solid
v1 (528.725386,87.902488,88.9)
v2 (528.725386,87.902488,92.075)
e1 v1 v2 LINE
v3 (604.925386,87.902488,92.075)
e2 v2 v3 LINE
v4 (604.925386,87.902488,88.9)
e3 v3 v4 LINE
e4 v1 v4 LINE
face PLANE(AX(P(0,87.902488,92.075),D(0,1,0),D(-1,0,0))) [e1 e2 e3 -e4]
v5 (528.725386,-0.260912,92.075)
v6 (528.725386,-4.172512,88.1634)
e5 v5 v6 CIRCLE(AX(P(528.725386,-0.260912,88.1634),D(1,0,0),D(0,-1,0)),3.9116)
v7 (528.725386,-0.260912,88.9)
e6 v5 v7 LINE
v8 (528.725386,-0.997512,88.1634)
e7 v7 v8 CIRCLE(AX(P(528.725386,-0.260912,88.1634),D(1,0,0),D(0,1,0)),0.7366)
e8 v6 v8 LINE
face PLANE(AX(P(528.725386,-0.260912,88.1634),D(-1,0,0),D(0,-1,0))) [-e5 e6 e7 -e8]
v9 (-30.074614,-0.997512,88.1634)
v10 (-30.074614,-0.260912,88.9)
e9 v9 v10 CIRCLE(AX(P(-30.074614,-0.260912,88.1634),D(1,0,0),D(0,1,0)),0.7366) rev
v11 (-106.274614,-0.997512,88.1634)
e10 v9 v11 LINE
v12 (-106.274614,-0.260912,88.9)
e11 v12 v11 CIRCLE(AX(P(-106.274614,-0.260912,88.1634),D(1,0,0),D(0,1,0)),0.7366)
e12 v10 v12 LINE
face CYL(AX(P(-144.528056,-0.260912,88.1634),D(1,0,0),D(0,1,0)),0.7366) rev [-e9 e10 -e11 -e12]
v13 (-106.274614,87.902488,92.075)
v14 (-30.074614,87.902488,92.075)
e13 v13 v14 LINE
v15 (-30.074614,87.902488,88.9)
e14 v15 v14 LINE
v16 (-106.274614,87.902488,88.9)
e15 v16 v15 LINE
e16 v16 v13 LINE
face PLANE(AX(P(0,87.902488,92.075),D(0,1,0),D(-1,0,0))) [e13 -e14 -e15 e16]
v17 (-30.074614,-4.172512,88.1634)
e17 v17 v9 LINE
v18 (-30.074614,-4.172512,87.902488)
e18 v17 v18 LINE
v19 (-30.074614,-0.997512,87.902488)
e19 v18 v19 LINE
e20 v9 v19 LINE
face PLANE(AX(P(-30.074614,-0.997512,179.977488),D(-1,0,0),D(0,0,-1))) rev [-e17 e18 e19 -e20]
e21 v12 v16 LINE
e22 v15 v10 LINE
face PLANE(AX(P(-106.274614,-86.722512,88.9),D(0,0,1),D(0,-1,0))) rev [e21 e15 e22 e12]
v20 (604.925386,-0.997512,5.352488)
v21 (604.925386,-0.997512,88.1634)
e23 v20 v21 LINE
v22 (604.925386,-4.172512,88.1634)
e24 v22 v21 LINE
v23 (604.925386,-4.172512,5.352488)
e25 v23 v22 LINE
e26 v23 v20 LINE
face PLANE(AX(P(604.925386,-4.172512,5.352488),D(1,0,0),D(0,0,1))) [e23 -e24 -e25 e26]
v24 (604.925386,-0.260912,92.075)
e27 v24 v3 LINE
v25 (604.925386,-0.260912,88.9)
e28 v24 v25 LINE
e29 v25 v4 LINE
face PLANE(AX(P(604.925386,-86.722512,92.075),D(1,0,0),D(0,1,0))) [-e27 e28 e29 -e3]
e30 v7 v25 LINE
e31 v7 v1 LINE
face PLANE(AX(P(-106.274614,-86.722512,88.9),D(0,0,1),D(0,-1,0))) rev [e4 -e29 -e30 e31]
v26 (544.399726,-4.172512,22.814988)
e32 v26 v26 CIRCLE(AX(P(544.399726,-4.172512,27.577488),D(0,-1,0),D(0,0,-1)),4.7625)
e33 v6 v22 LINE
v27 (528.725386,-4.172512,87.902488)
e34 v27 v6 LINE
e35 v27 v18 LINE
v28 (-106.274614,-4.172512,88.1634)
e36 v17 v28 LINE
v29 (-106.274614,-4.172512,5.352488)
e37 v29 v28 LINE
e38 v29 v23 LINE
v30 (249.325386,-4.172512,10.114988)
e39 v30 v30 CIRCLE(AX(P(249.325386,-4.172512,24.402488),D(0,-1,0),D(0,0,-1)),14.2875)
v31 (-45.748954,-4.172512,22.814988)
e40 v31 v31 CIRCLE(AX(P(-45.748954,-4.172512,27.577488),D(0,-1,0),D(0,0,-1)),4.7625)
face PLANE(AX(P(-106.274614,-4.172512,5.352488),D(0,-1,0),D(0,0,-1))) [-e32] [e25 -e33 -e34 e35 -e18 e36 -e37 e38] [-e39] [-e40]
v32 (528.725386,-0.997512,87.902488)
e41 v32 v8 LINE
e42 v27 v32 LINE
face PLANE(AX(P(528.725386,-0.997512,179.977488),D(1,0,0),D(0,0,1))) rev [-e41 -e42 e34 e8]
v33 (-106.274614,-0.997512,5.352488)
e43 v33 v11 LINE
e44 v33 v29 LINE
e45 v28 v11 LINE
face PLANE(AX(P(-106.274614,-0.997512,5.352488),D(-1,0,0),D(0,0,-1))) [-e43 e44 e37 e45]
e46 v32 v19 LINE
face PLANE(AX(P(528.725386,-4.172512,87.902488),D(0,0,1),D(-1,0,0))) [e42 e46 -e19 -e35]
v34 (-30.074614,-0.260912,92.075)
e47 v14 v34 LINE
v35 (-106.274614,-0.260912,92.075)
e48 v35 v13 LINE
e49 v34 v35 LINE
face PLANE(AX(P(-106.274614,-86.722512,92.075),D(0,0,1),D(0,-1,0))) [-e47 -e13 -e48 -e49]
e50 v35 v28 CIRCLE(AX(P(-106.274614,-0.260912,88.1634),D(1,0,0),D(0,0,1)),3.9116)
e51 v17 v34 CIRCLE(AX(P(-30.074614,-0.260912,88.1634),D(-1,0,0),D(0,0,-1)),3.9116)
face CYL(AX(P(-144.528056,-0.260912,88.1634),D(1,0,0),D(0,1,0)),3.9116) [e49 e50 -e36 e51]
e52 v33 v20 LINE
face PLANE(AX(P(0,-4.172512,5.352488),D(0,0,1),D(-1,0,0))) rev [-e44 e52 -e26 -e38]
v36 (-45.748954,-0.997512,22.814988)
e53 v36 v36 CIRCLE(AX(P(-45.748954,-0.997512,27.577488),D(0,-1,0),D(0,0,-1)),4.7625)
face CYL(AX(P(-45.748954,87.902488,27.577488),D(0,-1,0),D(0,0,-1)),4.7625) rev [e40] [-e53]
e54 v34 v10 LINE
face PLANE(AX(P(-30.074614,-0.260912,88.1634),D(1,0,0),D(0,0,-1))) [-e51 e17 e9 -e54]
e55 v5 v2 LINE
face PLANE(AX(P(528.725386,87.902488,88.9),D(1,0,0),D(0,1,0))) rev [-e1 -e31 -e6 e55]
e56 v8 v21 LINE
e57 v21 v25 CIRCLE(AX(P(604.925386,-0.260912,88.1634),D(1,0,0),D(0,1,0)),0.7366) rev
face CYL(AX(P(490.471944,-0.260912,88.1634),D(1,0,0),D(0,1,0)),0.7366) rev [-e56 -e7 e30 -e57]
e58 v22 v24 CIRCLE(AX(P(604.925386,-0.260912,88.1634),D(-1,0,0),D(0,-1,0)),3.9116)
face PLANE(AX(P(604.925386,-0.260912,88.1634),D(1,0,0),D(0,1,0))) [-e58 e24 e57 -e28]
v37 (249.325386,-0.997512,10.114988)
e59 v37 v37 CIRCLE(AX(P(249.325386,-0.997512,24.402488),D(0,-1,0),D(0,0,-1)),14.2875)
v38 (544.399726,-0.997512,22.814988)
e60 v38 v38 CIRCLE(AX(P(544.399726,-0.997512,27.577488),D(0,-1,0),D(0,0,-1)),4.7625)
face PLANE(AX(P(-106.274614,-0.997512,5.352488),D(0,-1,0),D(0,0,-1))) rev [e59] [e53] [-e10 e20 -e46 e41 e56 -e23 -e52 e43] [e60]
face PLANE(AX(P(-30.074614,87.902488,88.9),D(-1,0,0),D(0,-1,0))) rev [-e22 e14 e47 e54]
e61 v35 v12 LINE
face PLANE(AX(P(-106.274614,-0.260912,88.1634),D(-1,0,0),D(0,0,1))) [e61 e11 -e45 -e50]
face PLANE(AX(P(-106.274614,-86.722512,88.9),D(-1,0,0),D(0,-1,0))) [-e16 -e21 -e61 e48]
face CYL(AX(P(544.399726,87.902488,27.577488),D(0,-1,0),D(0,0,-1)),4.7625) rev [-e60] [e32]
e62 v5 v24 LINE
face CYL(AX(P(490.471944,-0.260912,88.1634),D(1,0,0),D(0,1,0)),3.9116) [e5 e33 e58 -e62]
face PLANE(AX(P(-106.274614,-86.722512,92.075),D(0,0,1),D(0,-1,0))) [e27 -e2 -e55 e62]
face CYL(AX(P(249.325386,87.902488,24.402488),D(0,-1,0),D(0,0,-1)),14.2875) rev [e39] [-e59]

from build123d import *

# Parameters (mm, degrees)
SKETCH18_W                   = 711.2
SKETCH18_H                   = 3.175
BASE_FLANGE1_DEPTH           = 174.625
SKETCH23_W                   = 215.9
SKETCH23_H                   = 88.9
CUT_EXTRUDE1_DEPTH           = 630.633777431
SKETCH24_W                   = 127
SKETCH24_H                   = 34.925
CUT_EXTRUDE2_DEPTH           = 630.633777431
SKETCH25_W                   = 215.9
SKETCH25_H                   = 88.9
CUT_EXTRUDE3_DEPTH           = 630.633777431
SKETCH32_W                   = 558.8
SKETCH32_H                   = 92.075
CUT_EXTRUDE6_DEPTH           = 630.633777431
SKETCHED_START               = -106.274614162
SKETCHED_BEND1_OUTLINE_W     = 3.175
SKETCHED_BEND1_OUTLINE_H     = 88.9
SKETCHED_BEND1_OUTLINE_H_2   = 82.55
SKETCHED_BEND1_DEPTH         = 635
SKETCHED_START_2             = 528.725385838
SKETCHED_BEND1_2_DEPTH       = 76.2
SKETCHED_BEND1_3_OUTLINE_W   = 82.55
SKETCHED_BEND1_3_OUTLINE_H   = 3.175
SKETCHED_BEND1_3_DEPTH       = 711.2
SKETCHED_BEND1_4_OUTLINE_W   = 0.997512257
SKETCHED_BEND1_4_OUTLINE_H   = 3.175
SKETCHED_BEND1_4_OUTLINE_W_2 = 87.902487743
SKETCHED_BEND1_4_DEPTH       = 76.2
SKETCHED_BEND1_5_DEPTH       = 76.2
SKETCHED_BEND2_DEPTH         = 711.2
SKETCHED_BEND2_2_OUTLINE_W   = 3.175
SKETCHED_BEND2_2_OUTLINE_H   = 82.55
SKETCHED_BEND2_2_DEPTH       = 711.2
SKETCHED_BEND2_3_DEPTH       = 76.2
SKETCHED_BEND2_4_DEPTH       = 76.2
SKETCH35_R                   = 14.2875
SKETCH35_R_2                 = 4.7625
CUT_EXTRUDE7_DEPTH           = 619.781329454


# Read off the part's stored shape, not the designer's step: Sketched Bend1, Sketched Bend2
# Sheet-metal steps are written as plain solids
with BuildPart() as part:
    # Sketch18 → Base-Flange1 (new body)
    with BuildSketch(Plane.XY):
        with Locations((249.325385838, -1.5875)):
            Rectangle(SKETCH18_W, SKETCH18_H)
    extrude(amount=BASE_FLANGE1_DEPTH)

    # Sketch23 → Cut-Extrude1 (cut, through all)
    with BuildSketch(Plane(origin=(0, 0, 0), x_dir=(1, 0, 0), z_dir=(0, 1, 0))):
        with Locations((77.875385838, -44.45)):
            Rectangle(SKETCH23_W, SKETCH23_H)
    extrude(amount=-CUT_EXTRUDE1_DEPTH, mode=Mode.SUBTRACT)

    # Sketch24 → Cut-Extrude2 (cut, through all)
    with BuildSketch(Plane(origin=(0, 0, 0), x_dir=(1, 0, 0), z_dir=(0, 1, 0))):
        with Locations((249.325385838, -17.4625)):
            Rectangle(SKETCH24_W, SKETCH24_H)
    extrude(amount=-CUT_EXTRUDE2_DEPTH, mode=Mode.SUBTRACT)

    # Sketch25 → Cut-Extrude3 (cut, through all)
    with BuildSketch(Plane(origin=(0, 0, 0), x_dir=(1, 0, 0), z_dir=(0, 1, 0))):
        with Locations((420.775385838, -44.45)):
            Rectangle(SKETCH25_W, SKETCH25_H)
    extrude(amount=-CUT_EXTRUDE3_DEPTH, mode=Mode.SUBTRACT)

    # Sketch32 → Cut-Extrude6 (cut, through all)
    with BuildSketch(Plane.XZ.offset(3.175)):
        with Locations((249.325385838, 46.0375)):
            Rectangle(SKETCH32_W, SKETCH32_H)
    extrude(amount=-CUT_EXTRUDE6_DEPTH, mode=Mode.SUBTRACT)

    # Sketched Bend1 outline → Sketched Bend1 (cut)
    with BuildSketch(Plane.YZ.offset(SKETCHED_START)):
        with Locations((-1.5875, 44.45)):
            Rectangle(SKETCHED_BEND1_OUTLINE_W, SKETCHED_BEND1_OUTLINE_H)
        with Locations((-1.5875, 133.35)):
            Rectangle(SKETCHED_BEND1_OUTLINE_W, SKETCHED_BEND1_OUTLINE_H_2)
    extrude(amount=SKETCHED_BEND1_DEPTH, mode=Mode.SUBTRACT)

    # Sketched Bend1 2 outline → Sketched Bend1 2 (cut)
    with BuildSketch(Plane.YZ.offset(SKETCHED_START_2)):
        with BuildLine():
            ThreePointArc((-3.175, 92.005018799), (-0.896479843, 90.655319942), (0, 88.1634))
            Line((0, 88.1634), (0, 174.625))
            Line((0, 174.625), (-3.175, 174.625))
            Line((-3.175, 174.625), (-3.175, 92.005018799))
        make_face()
    extrude(amount=SKETCHED_BEND1_2_DEPTH, mode=Mode.SUBTRACT)



with BuildPart() as body_2:
    # Sketched Bend1 3 outline → Sketched Bend1 3 (new body)
    with BuildSketch(Plane.YZ.offset(SKETCHED_START)):
        with Locations((-45.447512257, 90.4875)):
            Rectangle(SKETCHED_BEND1_3_OUTLINE_W, SKETCHED_BEND1_3_OUTLINE_H)
    extrude(amount=SKETCHED_BEND1_3_DEPTH)


with BuildPart() as part_1:
    add(part.part)

    add(body_2.part)  # Sketched Bend1 4 merges body 2
    # Sketched Bend1 4 outline → Sketched Bend1 4 (add)
    with BuildSketch(Plane.YZ.offset(SKETCHED_START)):
        with Locations((-3.673756128, 90.4875)):
            Rectangle(SKETCHED_BEND1_4_OUTLINE_W, SKETCHED_BEND1_4_OUTLINE_H)
        with Locations((43.951243872, 90.4875)):
            Rectangle(SKETCHED_BEND1_4_OUTLINE_W_2, SKETCHED_BEND1_4_OUTLINE_H)
    extrude(amount=SKETCHED_BEND1_4_DEPTH)

    # Sketched Bend1 5 outline → Sketched Bend1 5 (add)
    with BuildSketch(Plane.YZ.offset(SKETCHED_START_2)):
        with BuildLine():
            Line((-4.172512257, 88.9), (-3.9116, 88.9))
            ThreePointArc((-3.9116, 88.9), (-3.390745145, 88.684254855), (-3.175, 88.1634))
            Line((-3.175, 88.1634), (-3.175, 92.005018799))
            ThreePointArc((-3.175, 92.005018799), (-3.541641581, 92.057465398), (-3.9116, 92.075))
            Line((-3.9116, 92.075), (-4.172512257, 92.075))
            Line((-4.172512257, 92.075), (-4.172512257, 88.9))
        make_face()
    extrude(amount=SKETCHED_BEND1_5_DEPTH)

    # Sketched Bend2 outline → Sketched Bend2 (cut)
    with BuildSketch(Plane.YZ.offset(SKETCHED_START)):
        with BuildLine():
            ThreePointArc((-4.102531056, 88.9), (-2.752832199, 91.178520157), (-0.260912257, 92.075))
            Line((-0.260912257, 92.075), (-86.722512257, 92.075))
            Line((-86.722512257, 92.075), (-86.722512257, 88.9))
            Line((-86.722512257, 88.9), (-4.102531056, 88.9))
        make_face()
        with BuildLine():
            Line((-0.997512257, 5.352487743), (-3.175, 5.352487743))
            Line((-3.175, 5.352487743), (-3.175, 0))
            Line((-3.175, 0), (0, 0))
            Line((0, 0), (0, 88.1634))
            ThreePointArc((0, 88.1634), (-0.017534602, 88.533358419), (-0.069981201, 88.9))
            Line((-0.069981201, 88.9), (-0.260912257, 88.9))
            ThreePointArc((-0.260912257, 88.9), (-0.781767112, 88.684254855), (-0.997512257, 88.1634))
            Line((-0.997512257, 88.1634), (-0.997512257, 5.352487743))
        make_face()
    extrude(amount=SKETCHED_BEND2_DEPTH, mode=Mode.SUBTRACT)

    # Sketched Bend2 2 outline → Sketched Bend2 2 (add)
    with BuildSketch(Plane.YZ.offset(SKETCHED_START)):
        with Locations((-2.585012257, 46.627487743)):
            Rectangle(SKETCHED_BEND2_2_OUTLINE_W, SKETCHED_BEND2_2_OUTLINE_H)
    extrude(amount=SKETCHED_BEND2_2_DEPTH)

    # Sketched Bend2 3 outline → Sketched Bend2 3 (add)
    with BuildSketch(Plane.YZ.offset(SKETCHED_START_2)):
        with BuildLine():
            ThreePointArc((-4.102531056, 88.9), (-4.154977655, 88.533358419), (-4.172512257, 88.1634))
            Line((-4.172512257, 88.1634), (-4.172512257, 87.902487743))
            Line((-4.172512257, 87.902487743), (-3.175, 87.902487743))
            Line((-3.175, 87.902487743), (-3.175, 88.1634))
            ThreePointArc((-3.175, 88.1634), (-3.390745145, 88.684254855), (-3.9116, 88.9))
            Line((-3.9116, 88.9), (-4.102531056, 88.9))
        make_face()
        with BuildLine():
            ThreePointArc((-0.260912257, 92.075), (-1.201151194, 91.960315235), (-2.086256128, 91.622985858))
            ThreePointArc((-2.086256128, 91.622985858), (-0.767990693, 90.491131747), (-0.069981201, 88.9))
            Line((-0.069981201, 88.9), (87.902487743, 88.9))
            Line((87.902487743, 88.9), (87.902487743, 92.075))
            Line((87.902487743, 92.075), (-0.260912257, 92.075))
        make_face()
    extrude(amount=SKETCHED_BEND2_3_DEPTH)

    # Sketched Bend2 4 outline → Sketched Bend2 4 (add)
    with BuildSketch(Plane.YZ.offset(SKETCHED_START)):
        with BuildLine():
            ThreePointArc((-4.102531056, 88.9), (-4.154977655, 88.533358419), (-4.172512257, 88.1634))
            Line((-4.172512257, 88.1634), (-4.172512257, 87.902487743))
            Line((-4.172512257, 87.902487743), (-0.997512257, 87.902487743))
            Line((-0.997512257, 87.902487743), (-0.997512257, 88.1634))
            ThreePointArc((-0.997512257, 88.1634), (-0.781767112, 88.684254855), (-0.260912257, 88.9))
            Line((-0.260912257, 88.9), (-4.102531056, 88.9))
        make_face()
    extrude(amount=SKETCHED_BEND2_4_DEPTH)

    # Sketch35 → Cut-Extrude7 (cut, through all)
    with BuildSketch(Plane(origin=(0, -4.172512257, 0), x_dir=(-1, 0, 0), z_dir=(0, -1, 0))):
        with Locations(Location((-249.325385838, -24.402487743, 0), (0, 0, 90))):
            Circle(SKETCH35_R)
        with Locations(Location((-544.399725838, -27.577487743, 0), (0, 0, 90))):
            Circle(SKETCH35_R_2)
        with Locations(Location((45.748954162, -27.577487743, 0), (0, 0, 90))):
            Circle(SKETCH35_R_2)
    extrude(amount=-CUT_EXTRUDE7_DEPTH, mode=Mode.SUBTRACT)


solid = part_1.part
